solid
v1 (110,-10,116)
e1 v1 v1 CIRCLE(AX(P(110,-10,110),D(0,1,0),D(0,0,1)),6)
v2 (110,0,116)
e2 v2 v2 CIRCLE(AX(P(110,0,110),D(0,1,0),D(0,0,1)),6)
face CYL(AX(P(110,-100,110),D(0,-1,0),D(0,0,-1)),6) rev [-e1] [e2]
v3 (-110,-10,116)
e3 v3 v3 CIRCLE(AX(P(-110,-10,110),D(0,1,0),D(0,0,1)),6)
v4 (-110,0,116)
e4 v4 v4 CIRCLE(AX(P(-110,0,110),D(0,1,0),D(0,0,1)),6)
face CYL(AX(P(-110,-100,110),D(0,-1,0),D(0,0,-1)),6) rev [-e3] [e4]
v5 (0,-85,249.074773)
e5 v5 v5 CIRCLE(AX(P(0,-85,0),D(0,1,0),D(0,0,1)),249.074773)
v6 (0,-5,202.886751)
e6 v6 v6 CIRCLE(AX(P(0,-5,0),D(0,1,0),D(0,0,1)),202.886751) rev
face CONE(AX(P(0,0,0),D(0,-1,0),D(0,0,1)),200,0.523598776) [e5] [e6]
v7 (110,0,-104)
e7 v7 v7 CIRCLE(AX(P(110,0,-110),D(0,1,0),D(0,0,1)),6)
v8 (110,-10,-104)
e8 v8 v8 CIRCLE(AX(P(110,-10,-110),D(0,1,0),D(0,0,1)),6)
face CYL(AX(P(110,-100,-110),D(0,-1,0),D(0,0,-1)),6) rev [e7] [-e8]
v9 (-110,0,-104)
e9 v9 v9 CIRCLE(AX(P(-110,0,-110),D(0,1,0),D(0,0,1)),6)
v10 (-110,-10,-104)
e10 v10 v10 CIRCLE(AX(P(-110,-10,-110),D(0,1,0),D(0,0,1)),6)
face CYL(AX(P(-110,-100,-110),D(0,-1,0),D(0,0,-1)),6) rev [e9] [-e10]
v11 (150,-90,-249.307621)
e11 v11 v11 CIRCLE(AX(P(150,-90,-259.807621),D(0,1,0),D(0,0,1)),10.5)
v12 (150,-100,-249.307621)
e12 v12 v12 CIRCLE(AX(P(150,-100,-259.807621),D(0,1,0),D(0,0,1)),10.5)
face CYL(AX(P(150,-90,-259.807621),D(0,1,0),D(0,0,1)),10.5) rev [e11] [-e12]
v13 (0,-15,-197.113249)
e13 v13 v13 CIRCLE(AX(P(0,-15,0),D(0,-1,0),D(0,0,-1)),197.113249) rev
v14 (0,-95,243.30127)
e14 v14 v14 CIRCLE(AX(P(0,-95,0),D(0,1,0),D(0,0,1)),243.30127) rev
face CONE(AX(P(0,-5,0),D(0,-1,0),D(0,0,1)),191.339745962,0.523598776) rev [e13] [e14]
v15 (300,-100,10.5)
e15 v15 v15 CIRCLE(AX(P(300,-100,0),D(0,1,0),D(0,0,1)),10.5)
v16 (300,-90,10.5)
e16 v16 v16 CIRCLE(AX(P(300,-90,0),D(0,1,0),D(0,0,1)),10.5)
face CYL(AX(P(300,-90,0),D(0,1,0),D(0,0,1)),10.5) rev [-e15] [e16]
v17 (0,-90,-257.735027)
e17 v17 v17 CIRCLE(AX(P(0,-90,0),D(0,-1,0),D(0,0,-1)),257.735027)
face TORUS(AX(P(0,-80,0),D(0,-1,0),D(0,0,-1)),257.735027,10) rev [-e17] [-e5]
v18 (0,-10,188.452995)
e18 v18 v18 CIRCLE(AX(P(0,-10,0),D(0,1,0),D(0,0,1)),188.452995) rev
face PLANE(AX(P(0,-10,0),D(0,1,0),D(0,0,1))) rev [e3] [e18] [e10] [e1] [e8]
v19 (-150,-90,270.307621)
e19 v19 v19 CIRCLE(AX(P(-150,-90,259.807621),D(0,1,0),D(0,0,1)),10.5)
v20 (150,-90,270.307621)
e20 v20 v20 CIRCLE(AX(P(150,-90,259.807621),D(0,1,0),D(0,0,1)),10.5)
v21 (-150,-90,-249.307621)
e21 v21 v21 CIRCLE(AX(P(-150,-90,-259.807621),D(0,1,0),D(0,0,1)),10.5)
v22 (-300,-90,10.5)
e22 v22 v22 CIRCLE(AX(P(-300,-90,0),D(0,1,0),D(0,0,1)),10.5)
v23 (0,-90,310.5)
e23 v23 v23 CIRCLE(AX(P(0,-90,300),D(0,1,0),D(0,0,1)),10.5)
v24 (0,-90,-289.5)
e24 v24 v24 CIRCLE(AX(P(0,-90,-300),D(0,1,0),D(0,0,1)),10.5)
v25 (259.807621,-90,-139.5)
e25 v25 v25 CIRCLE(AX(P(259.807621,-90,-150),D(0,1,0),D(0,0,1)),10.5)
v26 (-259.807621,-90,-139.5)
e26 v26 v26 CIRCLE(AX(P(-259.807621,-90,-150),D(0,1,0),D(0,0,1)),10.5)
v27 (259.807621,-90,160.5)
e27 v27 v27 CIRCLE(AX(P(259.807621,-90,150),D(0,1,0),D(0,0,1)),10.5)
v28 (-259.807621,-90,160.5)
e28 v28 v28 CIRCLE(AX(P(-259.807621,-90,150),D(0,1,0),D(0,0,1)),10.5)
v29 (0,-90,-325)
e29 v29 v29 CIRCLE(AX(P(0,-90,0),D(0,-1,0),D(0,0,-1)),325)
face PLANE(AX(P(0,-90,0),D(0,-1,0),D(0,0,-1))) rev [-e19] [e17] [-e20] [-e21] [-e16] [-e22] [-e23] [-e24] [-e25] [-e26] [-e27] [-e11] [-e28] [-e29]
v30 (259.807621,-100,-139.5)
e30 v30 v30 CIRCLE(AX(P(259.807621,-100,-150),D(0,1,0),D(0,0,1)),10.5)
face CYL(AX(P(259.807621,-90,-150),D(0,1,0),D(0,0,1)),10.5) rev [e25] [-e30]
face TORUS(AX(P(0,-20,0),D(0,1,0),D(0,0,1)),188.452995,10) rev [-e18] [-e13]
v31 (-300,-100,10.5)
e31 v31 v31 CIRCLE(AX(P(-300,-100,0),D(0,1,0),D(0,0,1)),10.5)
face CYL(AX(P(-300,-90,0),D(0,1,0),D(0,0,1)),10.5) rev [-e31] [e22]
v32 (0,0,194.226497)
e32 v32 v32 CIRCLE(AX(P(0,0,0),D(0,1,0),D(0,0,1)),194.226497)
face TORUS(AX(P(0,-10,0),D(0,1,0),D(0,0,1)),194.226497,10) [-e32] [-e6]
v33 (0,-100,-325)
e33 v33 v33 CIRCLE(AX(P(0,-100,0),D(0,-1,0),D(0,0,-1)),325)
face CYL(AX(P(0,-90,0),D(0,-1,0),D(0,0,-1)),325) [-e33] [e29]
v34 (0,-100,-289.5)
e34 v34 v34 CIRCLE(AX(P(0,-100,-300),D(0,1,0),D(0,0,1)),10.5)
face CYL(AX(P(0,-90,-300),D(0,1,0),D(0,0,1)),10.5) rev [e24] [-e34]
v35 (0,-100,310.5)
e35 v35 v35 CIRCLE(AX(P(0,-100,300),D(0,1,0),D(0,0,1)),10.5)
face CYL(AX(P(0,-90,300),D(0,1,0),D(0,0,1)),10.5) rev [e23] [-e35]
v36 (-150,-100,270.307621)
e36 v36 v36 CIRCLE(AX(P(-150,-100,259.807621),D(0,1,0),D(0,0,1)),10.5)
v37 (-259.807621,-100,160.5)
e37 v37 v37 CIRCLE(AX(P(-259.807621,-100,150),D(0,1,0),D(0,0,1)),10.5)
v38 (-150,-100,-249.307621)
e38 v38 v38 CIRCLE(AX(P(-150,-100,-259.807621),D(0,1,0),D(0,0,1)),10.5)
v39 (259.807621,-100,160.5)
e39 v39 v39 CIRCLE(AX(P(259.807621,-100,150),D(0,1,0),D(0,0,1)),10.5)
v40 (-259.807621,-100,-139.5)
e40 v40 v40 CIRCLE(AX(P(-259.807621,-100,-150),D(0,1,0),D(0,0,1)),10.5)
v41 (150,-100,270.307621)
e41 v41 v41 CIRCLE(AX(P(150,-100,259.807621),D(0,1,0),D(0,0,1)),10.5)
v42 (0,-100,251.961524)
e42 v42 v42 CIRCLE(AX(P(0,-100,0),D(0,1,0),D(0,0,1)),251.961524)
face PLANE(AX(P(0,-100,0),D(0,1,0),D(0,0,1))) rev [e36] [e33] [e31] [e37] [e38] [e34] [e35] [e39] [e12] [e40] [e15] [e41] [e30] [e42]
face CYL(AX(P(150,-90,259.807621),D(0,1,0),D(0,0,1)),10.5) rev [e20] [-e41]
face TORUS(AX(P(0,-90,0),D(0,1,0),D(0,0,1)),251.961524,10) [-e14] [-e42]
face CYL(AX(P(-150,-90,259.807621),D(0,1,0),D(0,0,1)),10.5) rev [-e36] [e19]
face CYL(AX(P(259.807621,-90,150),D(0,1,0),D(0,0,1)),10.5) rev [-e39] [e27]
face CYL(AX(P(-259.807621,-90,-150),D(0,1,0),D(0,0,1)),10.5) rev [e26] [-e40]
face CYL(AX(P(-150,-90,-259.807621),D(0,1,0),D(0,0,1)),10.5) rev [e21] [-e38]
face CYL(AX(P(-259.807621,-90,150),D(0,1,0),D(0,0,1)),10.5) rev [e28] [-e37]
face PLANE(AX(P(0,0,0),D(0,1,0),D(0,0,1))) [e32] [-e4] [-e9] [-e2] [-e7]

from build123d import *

# Parameters (mm, degrees)
SKETCH_1_R               = 200
EXTRUDE_1_DEPTH          = 100
EXTRUDE_1_DRAFT          = 30
SKETCH_4_R               = 325
EXTRUDE_2_DEPTH          = 10
FILLET_1_R               = 10
HOLE_WIZARD_M14_1_D      = 12
HOLE_WIZARD_1_D          = 21
PATTERN_CIRCULAR_1_COUNT = 12


# Read off the part's stored shape, not the designer's step: 抽壳1
with BuildPart() as part:
    # 草图1 → 凸台-拉伸1 (with draft: the straight prism first)
    with BuildSketch(Plane(origin=(0, 0, 0), x_dir=(1, 0, 0), z_dir=(0, 1, 0))):
        Circle(SKETCH_1_R)
    extrude(amount=-EXTRUDE_1_DEPTH)
    # 凸台-拉伸1: the draft: its side faces are tilted about the plane it starts from
    extrude_1_sides = [part.faces().sort_by_distance(p)[0] for p in [
        (-200, -50, 0),
    ]]
    draft(extrude_1_sides, Plane(origin=(0, 0, 0), x_dir=(1, 0, 0), z_dir=(0, 1, 0)), EXTRUDE_1_DRAFT)

    # 草图4 → 凸台-拉伸2 (add)
    with BuildSketch(Plane.XZ.offset(100)):
        with Locations(Location((0, 0, 0), (0, 0, 270))):
            Circle(SKETCH_4_R)
    extrude(amount=-EXTRUDE_2_DEPTH)

    # 抽壳1 outline → 抽壳1 (revolve, cut)
    with BuildSketch(Plane.XY):
        Polygon((246.188021535, -100), (194.226497308, -10), (0, -10), (0, -100), align=None)
    revolve(axis=Axis((0, 0, 0), (0, 1, 0)), mode=Mode.SUBTRACT)

    # 圆角1
    fillet_1_edges = [part.edges().sort_by_distance(p)[0] for p in [
        (-246.188021535, -100, 0),
        (-194.226497308, -10, 0),
        (-200, 0, 0),
        (-251.961524227, -90, 0),
    ]]
    fillet(fillet_1_edges, radius=FILLET_1_R)

    # M14 螺纹孔1 (through all)
    with Locations(Plane(origin=(0, -100, 0), x_dir=(-1, 0, 0), z_dir=(0, -1, 0))):
        with Locations((-110, -110), (-110, 110), (110, -110), (110, 110)):
            Hole(HOLE_WIZARD_M14_1_D / 2)

    # 孔1 (through all)
    with Locations(Plane(origin=(0, -90, 0), x_dir=(1, 0, 0), z_dir=(0, 1, 0))):
        with Locations((300, 0)):
            hole_wizard_1 = Hole(HOLE_WIZARD_1_D / 2)

    # 阵列(圆周)1: 孔1 ×12 about axis
    pattern_circular_1_axis = Axis((0, 0, 0), (0, 1, 0))
    for i in range(1, PATTERN_CIRCULAR_1_COUNT):
        add(hole_wizard_1.rotate(pattern_circular_1_axis, i * 360 / PATTERN_CIRCULAR_1_COUNT), mode=Mode.SUBTRACT)


solid = part.part
